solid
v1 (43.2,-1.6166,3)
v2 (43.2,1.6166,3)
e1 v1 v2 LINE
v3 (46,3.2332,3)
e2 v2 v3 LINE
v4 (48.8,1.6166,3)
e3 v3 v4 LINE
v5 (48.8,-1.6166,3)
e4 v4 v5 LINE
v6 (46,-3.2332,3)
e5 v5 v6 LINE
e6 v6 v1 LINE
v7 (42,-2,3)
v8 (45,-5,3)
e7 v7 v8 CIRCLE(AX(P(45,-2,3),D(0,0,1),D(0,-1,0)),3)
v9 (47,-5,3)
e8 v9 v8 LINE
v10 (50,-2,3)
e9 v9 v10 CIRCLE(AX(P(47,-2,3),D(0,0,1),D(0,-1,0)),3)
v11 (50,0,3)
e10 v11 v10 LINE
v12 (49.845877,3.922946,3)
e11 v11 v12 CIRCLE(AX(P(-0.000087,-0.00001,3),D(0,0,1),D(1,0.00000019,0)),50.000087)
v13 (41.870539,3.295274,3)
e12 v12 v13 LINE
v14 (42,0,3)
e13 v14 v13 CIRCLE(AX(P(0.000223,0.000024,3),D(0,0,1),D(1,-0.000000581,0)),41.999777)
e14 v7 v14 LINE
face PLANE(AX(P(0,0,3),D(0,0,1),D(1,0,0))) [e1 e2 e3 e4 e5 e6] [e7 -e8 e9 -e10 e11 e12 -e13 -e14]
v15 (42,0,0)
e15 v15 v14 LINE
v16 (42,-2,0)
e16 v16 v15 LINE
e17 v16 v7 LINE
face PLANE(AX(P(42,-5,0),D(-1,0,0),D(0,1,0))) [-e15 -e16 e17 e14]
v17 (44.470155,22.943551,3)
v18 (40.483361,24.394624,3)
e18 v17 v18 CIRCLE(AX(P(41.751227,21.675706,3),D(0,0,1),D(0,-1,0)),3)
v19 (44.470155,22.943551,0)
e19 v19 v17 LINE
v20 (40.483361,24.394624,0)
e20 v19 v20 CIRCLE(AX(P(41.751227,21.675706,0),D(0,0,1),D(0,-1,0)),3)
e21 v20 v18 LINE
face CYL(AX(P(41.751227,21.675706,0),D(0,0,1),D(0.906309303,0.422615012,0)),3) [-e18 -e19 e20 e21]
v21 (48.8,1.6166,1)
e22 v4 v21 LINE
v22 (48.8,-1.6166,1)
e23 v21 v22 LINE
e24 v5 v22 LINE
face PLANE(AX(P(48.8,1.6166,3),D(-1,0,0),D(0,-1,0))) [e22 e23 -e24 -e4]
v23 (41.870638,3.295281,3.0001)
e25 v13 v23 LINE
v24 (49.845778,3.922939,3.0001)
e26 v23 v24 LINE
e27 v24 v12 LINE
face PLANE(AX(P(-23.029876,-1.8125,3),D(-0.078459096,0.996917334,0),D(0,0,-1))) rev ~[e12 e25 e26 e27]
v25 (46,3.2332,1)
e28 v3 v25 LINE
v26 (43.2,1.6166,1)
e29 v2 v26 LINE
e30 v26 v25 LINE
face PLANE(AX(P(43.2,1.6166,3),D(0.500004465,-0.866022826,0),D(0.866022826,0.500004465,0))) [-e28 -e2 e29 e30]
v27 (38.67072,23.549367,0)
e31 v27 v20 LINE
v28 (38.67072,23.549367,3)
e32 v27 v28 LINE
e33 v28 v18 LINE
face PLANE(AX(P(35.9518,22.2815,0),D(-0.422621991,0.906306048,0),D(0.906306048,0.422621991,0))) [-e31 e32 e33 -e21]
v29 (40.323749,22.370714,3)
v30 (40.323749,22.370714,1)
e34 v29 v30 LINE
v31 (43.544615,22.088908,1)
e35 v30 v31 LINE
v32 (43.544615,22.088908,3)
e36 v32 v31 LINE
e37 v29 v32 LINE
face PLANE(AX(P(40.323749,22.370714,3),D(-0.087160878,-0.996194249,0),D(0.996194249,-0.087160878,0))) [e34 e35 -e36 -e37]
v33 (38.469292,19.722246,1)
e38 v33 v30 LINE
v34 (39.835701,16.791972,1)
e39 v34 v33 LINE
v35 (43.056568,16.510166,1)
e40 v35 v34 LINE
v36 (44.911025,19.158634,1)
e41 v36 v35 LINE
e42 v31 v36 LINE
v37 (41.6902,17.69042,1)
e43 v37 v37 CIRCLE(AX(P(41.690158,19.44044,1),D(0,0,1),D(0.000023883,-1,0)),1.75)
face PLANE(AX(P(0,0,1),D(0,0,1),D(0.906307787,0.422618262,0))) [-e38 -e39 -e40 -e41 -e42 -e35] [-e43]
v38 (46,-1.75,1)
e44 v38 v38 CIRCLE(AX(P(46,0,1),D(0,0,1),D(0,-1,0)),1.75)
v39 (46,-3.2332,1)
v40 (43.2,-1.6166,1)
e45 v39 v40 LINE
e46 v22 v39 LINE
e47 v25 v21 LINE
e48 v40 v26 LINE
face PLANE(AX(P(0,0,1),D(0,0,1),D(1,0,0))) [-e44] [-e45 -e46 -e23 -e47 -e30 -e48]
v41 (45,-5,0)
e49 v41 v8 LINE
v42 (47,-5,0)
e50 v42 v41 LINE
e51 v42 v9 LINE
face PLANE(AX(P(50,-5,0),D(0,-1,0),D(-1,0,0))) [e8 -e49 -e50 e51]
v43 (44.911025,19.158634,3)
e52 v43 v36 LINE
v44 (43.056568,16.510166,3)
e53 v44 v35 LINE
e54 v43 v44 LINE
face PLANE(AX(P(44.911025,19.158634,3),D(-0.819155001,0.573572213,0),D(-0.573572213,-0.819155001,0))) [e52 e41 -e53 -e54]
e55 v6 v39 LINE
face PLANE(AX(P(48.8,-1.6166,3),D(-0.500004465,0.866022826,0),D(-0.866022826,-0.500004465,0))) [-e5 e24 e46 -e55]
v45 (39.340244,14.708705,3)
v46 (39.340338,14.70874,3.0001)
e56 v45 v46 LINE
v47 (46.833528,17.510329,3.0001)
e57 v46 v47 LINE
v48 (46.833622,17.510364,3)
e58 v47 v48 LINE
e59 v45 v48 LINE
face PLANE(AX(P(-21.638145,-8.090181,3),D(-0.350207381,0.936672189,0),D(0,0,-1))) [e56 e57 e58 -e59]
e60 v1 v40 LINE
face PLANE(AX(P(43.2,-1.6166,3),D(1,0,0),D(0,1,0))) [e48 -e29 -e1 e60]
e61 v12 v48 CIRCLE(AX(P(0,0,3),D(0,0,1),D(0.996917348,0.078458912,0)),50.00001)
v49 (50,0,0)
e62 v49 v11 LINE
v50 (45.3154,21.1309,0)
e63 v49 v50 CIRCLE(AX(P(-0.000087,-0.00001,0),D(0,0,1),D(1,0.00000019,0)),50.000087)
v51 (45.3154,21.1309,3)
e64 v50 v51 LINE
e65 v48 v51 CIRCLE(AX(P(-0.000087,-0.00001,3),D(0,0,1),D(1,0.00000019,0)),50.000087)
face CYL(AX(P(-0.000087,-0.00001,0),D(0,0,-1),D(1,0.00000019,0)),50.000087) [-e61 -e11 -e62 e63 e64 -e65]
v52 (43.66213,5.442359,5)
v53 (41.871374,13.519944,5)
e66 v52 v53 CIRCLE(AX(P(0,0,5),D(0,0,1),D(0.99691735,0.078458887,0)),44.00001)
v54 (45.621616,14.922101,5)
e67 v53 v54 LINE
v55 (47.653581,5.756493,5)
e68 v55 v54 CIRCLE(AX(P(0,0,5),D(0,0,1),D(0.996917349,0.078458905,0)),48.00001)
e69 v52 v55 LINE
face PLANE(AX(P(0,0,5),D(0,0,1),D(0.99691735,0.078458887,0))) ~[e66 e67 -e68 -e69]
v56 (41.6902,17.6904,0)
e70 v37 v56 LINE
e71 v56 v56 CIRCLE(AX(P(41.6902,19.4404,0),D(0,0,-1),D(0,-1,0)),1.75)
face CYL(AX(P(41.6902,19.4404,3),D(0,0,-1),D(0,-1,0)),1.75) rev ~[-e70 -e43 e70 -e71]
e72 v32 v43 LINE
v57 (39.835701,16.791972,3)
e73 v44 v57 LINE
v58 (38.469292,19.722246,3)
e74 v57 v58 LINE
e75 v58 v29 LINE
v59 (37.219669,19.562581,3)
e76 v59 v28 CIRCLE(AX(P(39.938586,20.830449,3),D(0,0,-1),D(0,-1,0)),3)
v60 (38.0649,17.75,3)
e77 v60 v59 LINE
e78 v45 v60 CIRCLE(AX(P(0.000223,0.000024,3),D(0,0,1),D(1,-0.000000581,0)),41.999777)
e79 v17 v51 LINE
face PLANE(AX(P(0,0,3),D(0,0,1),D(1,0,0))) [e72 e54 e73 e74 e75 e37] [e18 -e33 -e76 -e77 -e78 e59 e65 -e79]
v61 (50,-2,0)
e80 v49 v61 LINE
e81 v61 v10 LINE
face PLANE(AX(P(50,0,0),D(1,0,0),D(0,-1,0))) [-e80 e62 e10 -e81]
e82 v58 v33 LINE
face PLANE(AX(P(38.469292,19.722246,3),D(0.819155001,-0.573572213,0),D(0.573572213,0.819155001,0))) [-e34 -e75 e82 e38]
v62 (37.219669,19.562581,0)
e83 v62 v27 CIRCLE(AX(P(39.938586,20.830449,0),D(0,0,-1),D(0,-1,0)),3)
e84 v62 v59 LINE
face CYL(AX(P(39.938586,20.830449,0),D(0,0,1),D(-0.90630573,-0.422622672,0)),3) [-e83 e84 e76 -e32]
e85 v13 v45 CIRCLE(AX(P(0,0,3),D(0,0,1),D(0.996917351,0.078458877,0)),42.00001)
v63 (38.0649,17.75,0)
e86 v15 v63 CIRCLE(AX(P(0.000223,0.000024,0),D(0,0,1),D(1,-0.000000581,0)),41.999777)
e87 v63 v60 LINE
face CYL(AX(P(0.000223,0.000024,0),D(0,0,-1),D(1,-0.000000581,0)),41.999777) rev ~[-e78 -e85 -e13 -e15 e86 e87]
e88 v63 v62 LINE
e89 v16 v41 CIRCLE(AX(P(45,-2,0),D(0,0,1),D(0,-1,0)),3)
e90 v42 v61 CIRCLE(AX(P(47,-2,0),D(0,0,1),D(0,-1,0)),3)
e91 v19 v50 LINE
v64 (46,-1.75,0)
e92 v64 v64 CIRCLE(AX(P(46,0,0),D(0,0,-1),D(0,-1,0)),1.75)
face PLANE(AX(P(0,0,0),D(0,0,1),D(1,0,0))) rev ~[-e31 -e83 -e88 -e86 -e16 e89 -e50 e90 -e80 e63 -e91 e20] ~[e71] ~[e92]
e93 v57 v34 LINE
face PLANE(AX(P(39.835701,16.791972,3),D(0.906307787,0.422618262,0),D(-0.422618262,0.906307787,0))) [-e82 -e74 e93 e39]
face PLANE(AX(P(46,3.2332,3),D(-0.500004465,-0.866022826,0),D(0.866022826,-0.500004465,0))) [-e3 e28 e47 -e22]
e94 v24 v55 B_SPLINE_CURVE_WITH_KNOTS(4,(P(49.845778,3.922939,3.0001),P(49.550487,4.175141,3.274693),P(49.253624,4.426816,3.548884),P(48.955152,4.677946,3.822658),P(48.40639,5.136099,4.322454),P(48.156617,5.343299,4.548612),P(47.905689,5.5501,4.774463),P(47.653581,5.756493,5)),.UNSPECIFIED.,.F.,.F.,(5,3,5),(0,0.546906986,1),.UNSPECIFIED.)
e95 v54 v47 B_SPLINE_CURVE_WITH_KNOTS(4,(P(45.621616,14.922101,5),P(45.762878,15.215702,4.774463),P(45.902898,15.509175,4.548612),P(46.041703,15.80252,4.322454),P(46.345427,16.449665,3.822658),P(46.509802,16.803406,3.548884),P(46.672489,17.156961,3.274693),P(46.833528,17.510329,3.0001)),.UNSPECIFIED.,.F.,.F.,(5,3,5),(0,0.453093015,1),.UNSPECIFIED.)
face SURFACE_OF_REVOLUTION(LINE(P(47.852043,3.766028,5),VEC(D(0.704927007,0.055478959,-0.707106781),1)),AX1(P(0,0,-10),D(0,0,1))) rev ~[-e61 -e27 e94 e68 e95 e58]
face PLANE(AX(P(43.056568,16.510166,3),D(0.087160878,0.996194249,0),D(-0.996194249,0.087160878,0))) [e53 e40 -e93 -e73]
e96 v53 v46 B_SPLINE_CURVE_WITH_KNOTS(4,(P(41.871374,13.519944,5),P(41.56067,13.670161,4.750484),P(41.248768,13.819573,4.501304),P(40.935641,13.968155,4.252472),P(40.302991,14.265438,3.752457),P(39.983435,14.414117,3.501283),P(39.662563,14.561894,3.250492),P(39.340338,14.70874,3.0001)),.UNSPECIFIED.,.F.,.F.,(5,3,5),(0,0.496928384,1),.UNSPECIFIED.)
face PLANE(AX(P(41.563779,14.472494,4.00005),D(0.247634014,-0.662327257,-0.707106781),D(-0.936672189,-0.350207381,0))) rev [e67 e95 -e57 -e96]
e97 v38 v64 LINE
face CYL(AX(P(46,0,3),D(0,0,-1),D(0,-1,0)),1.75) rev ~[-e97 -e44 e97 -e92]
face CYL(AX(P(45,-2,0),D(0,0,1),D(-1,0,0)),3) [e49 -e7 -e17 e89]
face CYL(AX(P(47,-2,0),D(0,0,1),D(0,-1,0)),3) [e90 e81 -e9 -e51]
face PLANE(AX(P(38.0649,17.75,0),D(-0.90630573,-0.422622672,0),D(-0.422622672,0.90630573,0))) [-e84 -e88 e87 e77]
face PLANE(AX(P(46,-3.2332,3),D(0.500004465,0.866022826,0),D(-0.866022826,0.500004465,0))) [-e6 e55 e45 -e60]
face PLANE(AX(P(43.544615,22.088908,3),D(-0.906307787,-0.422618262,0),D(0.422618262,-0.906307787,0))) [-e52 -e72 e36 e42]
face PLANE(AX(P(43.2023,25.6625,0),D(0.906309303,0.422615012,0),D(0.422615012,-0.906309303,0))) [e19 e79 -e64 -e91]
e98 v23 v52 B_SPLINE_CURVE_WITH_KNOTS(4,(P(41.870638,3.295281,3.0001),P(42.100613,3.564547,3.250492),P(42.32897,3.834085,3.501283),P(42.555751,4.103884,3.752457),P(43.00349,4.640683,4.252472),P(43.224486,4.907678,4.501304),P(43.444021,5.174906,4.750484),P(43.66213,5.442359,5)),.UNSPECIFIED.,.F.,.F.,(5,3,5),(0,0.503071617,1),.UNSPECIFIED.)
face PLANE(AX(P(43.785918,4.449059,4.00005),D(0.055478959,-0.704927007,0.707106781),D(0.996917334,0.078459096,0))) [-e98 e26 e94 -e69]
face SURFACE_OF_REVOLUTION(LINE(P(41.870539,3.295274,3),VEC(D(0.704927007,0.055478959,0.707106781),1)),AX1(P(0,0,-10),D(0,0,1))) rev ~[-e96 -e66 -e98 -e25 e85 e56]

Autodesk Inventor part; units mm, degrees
ref_plane "YZ Plane" through (0, 0, 0) normal (1, 0, 0) x (0, 1, 0)
ref_plane "XZ Plane" through (0, 0, 0) normal (0, 1, 0) x (-1, 0, 0)
sketch "スケッチ1" plane through (0, 0, 0) normal (0, 0, 1) x (1, 0, 0)
  arc A0 (46, 0) -> (41.6902, 19.4404) centre (0, 0) ccw construction
  line L0 (0, 0) -> (46, 0) construction
  line L1 (0, 0) -> (46, 0) construction
  line L2 (0, 0) -> (41.6902, 19.4404) construction
  arc A1 (50, 0) -> (45.3154, 21.1309) centre (0, 0) ccw
  arc A2 (42, 0) -> (38.0649, 17.75) centre (0, 0) ccw
  line L3 (42, 0) -> (50, 0)
  line L4 (50, 0) -> (50, -5)
  line L5 (50, -5) -> (42, -5)
  line L6 (42, -5) -> (42, 0)
  line L7 (45.3154, 21.1309) -> (38.0649, 17.75)
  line L8 (38.0649, 17.75) -> (35.9518, 22.2815)
  line L9 (35.9518, 22.2815) -> (43.2023, 25.6625)
  line L10 (43.2023, 25.6625) -> (45.3154, 21.1309)
  dimension "d0" = 46
  dimension "d1" = 0
  dimension "d2" = 25
  dimension "d3" = 4
  dimension "d4" = 4
  dimension "d5" = 8
  dimension "d6" = 5
  dimension "d7" = 5
extrude "押し出し1" add sketch "スケッチ1" along normal blind 3
sketch "スケッチ2" plane through (0, 0, 3) normal (0, 0, 1) x (1, 0, 0)
  arc A0 (46, 0) -> (41.6902, 19.4404) centre (0, 0) ccw construction
  line L0 (0, 0) -> (46, 0) construction
  line L1 (0, 0) -> (46, 0) construction
  line L2 (0, 0) -> (41.6902, 19.4404) construction
  dimension "d10" = 46
  dimension "d11" = 0
  dimension "d12" = 25
hole "穴1" at (41.6902, 19.4404, 3) at (46, 0, 3) direction (0, 0, -1) diameter 3.5 end through all
sketch "スケッチ3" plane through (0, 0, 3) normal (0, 0, 1) x (1, 0, 0)
  circle A0 centre (46, 0) radius 1.75 projected
  line L0 (46, 3.2332) -> (48.8, 1.6166)
  line L1 (48.8, 1.6166) -> (48.8, -1.6166)
  line L2 (48.8, -1.6166) -> (46, -3.2332)
  line L3 (46, -3.2332) -> (43.2, -1.6166)
  line L4 (43.2, -1.6166) -> (43.2, 1.6166)
  line L5 (43.2, 1.6166) -> (46, 3.2332)
  point P0 (0, 0)
  dimension "d20" = 5.6
extrude "押し出し2" cut sketch "スケッチ3" against normal blind 2
pattern_circular "円形状パターン1" count 2 over 25 about axis through (0, 0, -10) along (0, 0, 1) of "押し出し2"
ref_plane "作業平面1" through (-22.5535, -5, 3) normal (-0.2164396, 0.976296, 0) x (0, 0, -1)
sketch "スケッチ4" plane through (-22.5535, -5, 3) normal (-0.2164396, 0.976296, 0) x (0, 0, -1)
  line L0 (3, -73.1011) -> (0, -73.1011) projected
  line L1 (0, -65.1011) -> (3, -65.1011) projected
  line L2 (0, -65.1011) -> (0, -64.1056) projected
  line L3 (0, -73.1011) -> (0, -65.1011)
  line L4 (0, -65.1011) -> (-2, -67.1011)
  line L5 (-2, -67.1011) -> (-2, -71.1011)
  line L6 (0, -71.9159) -> (0, -73.1011) projected
  line L7 (-2, -71.1011) -> (0, -73.1011)
  line L8 (4, -23.1011) -> (-3, -23.1011) projected
  point P0 (3, -23.1011)
  dimension "d26" = 45
  dimension "d27" = 45
  dimension "d28" = 2
revolve "回転1" add sketch "スケッチ4" angle 16 mid plane about axis through (0, 0, -10) along (0, 0, 1)
chamfer "面取り1" distance 2 angle 45 2 edges at (43.0869, 16.1095, 5) (45.8582, 3.6091, 5)
fillet "フィレット1" radius 3 4 edges at (43.2023, 25.6625, 1.5) (35.9518, 22.2815, 1.5) (50, -5, 1.5) (42, -5, 1.5)
equation "\"d4\" = d3"
equation "\"d6\" = d7"
equation "\"d27\" = d26"
properties part number "3D_frame-connect-base2-2_3D プリント"
